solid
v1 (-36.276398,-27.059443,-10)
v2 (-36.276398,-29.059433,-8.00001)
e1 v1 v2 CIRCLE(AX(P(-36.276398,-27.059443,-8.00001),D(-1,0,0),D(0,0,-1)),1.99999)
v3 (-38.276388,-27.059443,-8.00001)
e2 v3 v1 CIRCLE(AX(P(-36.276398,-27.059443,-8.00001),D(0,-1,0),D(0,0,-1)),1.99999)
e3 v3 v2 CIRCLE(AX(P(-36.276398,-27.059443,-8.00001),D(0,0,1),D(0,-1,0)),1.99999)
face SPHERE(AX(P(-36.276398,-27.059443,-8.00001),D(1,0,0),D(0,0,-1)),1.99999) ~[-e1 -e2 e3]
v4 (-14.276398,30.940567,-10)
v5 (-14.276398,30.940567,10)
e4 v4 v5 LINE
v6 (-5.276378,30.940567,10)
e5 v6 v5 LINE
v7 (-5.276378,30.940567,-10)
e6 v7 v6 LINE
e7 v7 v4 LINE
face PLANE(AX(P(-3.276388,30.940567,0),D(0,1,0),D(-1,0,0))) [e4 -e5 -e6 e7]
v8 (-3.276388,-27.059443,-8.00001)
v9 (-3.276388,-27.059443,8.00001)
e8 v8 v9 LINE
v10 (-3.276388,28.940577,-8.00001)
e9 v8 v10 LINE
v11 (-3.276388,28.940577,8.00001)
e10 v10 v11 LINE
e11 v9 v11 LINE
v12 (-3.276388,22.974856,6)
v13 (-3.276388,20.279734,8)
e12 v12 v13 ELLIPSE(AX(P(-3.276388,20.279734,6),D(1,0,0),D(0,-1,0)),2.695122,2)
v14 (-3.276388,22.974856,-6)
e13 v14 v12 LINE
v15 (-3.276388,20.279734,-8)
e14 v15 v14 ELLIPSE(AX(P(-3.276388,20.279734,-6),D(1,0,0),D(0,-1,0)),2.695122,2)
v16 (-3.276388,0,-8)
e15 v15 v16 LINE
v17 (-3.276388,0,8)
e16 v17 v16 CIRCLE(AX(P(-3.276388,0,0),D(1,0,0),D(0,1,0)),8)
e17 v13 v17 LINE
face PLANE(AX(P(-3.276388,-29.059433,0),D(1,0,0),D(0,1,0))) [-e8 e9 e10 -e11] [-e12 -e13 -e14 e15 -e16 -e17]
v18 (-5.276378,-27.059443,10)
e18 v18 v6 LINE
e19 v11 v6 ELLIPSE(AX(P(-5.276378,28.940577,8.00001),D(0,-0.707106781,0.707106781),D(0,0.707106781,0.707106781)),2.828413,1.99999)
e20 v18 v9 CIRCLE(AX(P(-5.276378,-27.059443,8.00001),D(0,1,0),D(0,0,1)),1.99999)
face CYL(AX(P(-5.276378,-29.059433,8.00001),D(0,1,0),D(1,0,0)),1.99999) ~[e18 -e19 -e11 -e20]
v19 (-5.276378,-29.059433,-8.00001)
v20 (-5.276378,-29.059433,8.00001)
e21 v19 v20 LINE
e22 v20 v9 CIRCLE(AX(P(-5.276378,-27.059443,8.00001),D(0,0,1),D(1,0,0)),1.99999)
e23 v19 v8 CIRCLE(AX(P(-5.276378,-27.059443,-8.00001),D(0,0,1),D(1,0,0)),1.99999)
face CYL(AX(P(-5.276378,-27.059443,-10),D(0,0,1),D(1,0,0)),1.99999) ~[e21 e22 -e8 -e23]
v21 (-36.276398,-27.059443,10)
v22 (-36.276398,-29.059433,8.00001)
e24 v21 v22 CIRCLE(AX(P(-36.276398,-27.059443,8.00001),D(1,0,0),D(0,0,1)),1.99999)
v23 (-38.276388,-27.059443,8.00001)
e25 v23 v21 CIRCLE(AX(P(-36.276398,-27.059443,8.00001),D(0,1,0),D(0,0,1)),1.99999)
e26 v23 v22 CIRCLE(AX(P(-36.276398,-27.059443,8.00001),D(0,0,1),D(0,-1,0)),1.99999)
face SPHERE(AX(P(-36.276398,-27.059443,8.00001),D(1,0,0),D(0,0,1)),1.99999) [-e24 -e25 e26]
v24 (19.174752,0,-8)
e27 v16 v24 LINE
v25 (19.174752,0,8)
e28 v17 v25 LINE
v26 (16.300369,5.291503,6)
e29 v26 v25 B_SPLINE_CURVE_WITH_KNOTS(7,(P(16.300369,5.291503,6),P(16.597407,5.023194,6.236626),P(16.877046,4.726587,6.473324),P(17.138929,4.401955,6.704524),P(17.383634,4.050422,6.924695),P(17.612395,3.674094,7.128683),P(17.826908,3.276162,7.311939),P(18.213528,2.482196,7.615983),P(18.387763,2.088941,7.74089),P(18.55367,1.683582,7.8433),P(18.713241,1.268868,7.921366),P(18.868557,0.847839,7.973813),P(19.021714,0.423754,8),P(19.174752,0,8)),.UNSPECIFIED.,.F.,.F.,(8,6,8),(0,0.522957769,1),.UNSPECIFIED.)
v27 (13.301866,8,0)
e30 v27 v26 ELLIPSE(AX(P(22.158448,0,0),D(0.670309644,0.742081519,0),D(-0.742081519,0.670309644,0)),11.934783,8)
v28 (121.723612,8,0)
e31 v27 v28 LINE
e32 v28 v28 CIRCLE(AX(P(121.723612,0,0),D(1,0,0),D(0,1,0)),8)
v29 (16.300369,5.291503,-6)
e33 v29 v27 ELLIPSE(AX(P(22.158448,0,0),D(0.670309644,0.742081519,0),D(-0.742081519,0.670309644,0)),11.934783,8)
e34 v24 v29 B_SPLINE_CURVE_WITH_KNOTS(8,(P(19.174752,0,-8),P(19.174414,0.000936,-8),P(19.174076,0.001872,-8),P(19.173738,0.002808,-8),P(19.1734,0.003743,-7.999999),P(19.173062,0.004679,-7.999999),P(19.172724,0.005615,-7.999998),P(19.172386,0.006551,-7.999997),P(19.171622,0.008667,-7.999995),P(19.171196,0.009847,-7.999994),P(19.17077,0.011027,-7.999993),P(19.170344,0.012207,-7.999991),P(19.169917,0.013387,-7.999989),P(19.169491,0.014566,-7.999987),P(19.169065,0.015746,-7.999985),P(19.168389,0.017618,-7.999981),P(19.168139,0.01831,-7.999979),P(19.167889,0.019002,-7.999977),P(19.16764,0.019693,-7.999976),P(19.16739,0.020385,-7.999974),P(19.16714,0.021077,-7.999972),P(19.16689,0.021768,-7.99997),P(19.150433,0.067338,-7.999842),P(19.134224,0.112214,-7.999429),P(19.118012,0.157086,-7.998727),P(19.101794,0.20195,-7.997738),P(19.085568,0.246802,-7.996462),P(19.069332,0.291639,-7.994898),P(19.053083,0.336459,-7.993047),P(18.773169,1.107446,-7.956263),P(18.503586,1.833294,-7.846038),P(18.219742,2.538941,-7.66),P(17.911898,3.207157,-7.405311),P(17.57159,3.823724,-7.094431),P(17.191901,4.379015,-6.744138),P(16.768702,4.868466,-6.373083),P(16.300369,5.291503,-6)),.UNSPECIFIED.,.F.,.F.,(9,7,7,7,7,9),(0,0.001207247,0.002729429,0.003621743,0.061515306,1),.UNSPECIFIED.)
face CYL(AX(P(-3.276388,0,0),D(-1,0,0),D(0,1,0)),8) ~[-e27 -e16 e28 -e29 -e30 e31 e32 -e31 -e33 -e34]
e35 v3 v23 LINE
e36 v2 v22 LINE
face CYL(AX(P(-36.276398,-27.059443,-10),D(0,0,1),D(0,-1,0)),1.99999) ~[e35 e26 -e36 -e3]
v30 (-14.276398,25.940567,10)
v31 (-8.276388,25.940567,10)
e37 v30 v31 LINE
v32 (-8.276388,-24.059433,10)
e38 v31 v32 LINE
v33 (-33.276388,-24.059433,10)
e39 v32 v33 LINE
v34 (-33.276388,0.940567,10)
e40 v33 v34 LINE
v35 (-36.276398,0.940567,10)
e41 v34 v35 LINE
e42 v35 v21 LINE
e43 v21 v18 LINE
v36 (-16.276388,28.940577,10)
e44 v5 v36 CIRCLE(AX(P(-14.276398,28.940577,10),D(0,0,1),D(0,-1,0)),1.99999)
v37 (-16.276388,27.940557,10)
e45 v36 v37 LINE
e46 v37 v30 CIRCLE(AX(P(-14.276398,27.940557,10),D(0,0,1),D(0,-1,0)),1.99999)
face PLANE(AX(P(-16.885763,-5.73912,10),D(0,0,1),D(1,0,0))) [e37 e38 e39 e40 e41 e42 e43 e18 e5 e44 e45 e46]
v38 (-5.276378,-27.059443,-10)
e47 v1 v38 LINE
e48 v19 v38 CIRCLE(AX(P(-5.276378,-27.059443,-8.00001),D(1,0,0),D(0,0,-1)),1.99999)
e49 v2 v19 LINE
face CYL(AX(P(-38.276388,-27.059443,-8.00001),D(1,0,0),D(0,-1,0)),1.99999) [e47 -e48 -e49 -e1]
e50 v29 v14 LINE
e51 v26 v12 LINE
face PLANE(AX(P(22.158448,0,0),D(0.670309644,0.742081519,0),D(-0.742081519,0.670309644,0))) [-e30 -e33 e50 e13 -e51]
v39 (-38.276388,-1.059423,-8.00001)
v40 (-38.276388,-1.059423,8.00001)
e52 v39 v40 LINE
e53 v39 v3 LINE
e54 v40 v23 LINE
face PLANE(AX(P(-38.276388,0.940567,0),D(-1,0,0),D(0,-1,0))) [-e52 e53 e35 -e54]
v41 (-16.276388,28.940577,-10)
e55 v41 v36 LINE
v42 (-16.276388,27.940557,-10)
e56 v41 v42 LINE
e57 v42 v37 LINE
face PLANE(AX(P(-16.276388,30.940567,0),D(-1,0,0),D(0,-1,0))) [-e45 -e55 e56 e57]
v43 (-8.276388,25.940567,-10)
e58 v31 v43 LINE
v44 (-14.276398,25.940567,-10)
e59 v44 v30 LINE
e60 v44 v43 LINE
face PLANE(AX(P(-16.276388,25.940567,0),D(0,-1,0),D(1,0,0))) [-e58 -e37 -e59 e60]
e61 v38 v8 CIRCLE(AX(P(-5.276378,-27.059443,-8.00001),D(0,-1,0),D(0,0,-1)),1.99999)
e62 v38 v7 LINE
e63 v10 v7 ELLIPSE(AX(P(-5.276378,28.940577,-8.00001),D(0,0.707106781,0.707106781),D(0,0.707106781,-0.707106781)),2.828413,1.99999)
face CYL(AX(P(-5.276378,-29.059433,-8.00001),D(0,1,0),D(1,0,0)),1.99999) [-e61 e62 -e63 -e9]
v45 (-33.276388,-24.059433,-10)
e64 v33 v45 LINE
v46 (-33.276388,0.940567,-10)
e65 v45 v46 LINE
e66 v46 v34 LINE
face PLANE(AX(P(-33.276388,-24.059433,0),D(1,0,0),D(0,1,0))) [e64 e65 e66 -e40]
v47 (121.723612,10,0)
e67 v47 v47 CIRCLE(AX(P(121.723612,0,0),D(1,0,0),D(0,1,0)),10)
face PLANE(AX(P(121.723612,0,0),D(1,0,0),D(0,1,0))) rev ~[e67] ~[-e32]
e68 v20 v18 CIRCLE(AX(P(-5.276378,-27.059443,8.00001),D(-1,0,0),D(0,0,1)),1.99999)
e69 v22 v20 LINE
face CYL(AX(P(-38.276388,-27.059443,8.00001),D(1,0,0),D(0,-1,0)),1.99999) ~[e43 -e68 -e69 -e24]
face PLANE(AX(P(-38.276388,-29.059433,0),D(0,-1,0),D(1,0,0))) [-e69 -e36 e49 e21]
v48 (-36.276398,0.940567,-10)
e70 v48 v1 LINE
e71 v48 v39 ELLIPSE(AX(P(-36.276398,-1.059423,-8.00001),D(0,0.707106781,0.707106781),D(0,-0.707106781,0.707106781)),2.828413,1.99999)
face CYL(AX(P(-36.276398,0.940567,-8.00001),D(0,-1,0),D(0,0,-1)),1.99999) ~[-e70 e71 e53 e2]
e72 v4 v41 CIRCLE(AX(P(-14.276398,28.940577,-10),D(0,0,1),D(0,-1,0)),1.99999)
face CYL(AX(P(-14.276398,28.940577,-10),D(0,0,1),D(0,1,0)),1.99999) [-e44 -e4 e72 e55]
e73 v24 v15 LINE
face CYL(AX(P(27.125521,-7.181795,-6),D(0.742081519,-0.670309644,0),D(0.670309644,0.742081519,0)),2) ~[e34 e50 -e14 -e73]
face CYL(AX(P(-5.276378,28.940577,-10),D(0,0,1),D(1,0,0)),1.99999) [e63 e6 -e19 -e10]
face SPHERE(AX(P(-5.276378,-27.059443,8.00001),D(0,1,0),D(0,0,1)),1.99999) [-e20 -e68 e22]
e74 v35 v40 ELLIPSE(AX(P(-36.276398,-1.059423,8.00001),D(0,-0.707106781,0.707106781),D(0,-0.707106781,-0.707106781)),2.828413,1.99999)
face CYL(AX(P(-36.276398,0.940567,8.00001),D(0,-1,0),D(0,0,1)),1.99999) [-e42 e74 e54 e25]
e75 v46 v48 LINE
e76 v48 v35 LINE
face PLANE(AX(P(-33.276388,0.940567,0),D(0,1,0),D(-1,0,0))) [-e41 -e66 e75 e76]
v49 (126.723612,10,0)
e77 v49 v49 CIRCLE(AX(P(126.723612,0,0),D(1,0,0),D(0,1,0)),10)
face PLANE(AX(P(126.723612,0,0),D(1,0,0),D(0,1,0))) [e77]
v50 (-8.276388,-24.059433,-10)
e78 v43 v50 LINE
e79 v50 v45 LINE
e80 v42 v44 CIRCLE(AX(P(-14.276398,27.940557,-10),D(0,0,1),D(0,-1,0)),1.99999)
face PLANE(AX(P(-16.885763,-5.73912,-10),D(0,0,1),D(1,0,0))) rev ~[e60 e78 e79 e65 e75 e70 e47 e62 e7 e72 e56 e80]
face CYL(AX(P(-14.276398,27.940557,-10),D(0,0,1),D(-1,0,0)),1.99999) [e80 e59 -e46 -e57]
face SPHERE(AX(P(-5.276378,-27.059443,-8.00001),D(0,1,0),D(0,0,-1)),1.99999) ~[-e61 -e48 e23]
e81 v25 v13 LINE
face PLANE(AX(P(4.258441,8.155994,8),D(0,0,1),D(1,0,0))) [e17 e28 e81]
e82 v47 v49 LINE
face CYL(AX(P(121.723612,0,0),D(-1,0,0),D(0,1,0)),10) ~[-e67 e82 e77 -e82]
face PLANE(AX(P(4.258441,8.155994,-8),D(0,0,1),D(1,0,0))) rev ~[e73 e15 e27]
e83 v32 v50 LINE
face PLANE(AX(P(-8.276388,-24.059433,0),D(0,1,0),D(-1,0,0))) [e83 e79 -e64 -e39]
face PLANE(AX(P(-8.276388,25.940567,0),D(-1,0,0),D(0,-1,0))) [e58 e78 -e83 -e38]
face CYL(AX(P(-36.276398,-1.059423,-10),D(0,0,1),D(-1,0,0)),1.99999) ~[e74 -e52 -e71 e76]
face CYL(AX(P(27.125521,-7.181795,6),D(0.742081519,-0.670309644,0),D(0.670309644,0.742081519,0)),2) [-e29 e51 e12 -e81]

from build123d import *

# Parameters (mm, degrees)
F1_DEPTH     = 10
F2_R         = 8
F3_DEPTH     = 125
F4_R         = 10
F4_R_2       = 8
F5_DEPTH     = 5
F7_DEPTH     = 8
F8_T4_DEPTH  = 47.7749887628
F8_S5_R      = 8
F8_T6_DEPTH  = 26
F8_T11_DEPTH = 47.7749887628
F8_S12_R     = 8
F8_T13_DEPTH = 26
F9_R         = 1.99999


# Not quite as in the source:
# - a fillet or chamfer that OpenCascade refuses, or shapes differently, is made with other operations: its cross-section is extruded or revolved along the edge and cut away or added
# - a fillet or chamfer is up to 0.001 mm smaller than in the source, because OpenCascade refuses the exact size


with BuildPart() as f1:
    # F0 (on Top) → F1 (new body, symmetric)
    with BuildSketch(Plane.XY):
        Polygon((-33.2763881331, -24.0594327205), (-33.2763881331, 0.9405672795), (-38.2763881331, 0.9405672795), (-38.2763881331, -29.0594327205), (-3.2763881331, -29.0594327205), (-3.2763881331, 30.9405672795), (-16.2763881331, 30.9405672795), (-16.2763881331, 25.9405672795), (-8.2763881331, 25.9405672795), (-8.2763881331, -24.0594327205), align=None)
    extrude(amount=F1_DEPTH, both=True)

    # F2 (on face) → F3 (join)
    with BuildSketch(Plane.YZ.offset(-3.2763881331)):
        Circle(F2_R)
    extrude(amount=F3_DEPTH)

    # F4 (on face) → F5 (join)
    with BuildSketch(Plane.YZ.offset(121.7236118669)):
        Circle(F4_R)
        Circle(F4_R_2, mode=Mode.SUBTRACT)
        Circle(F4_R_2)
    extrude(amount=F5_DEPTH)

    # F6 (on Top) → F7 (join, symmetric)
    with BuildSketch(Plane.XY):
        Polygon((22.1584475915, 0), (-4.7209444456, 24.2796987295), (-7.46962009, 0), align=None)
    extrude(amount=F7_DEPTH, both=True)

    # F8: fillet of radius 2 on 2 edges, made by hand


with BuildPart() as f8_tool2:
    # F8_s3 → F8_t4 (new body)
    with BuildSketch(Plane(origin=(18.5100171986, -16.719784452, 0), x_dir=(0, 0, 1), z_dir=(-0.742081519, 0.6703096442, 0))):
        with BuildLine():
            ThreePointArc((6, 14.8530211221), (7.4142135624, 14.2672346845), (8, 12.8530211221))
            Line((8, 12.8530211221), (8, 14.8530211221))
            Line((8, 14.8530211221), (6, 14.8530211221))
        make_face()
    extrude(amount=F8_T4_DEPTH)

    # F8_s5 → F8_t6 (cut, symmetric)
    with BuildSketch(Plane.YZ.offset(10.1)):
        Circle(F8_S5_R)
    extrude(amount=F8_T6_DEPTH, both=True, mode=Mode.SUBTRACT)

    split(bisect_by=Plane.YZ.offset(-3.2763881331), keep=Keep.TOP)


with BuildPart() as f1_1:
    add(f1.part)

    # F8_t1: cut F8_tool2
    add(f8_tool2.part, mode=Mode.SUBTRACT)


with BuildPart() as f8_tool9:
    # F8_s10 → F8_t11 (new body)
    with BuildSketch(Plane(origin=(18.5100171986, -16.719784452, 0), x_dir=(0, 0, 1), z_dir=(-0.742081519, 0.6703096442, 0))):
        with BuildLine():
            ThreePointArc((-6, 14.8530211221), (-7.4142135624, 14.2672346845), (-8, 12.8530211221))
            Line((-8, 12.8530211221), (-8, 14.8530211221))
            Line((-8, 14.8530211221), (-6, 14.8530211221))
        make_face()
    extrude(amount=F8_T11_DEPTH)

    # F8_s12 → F8_t13 (cut, symmetric)
    with BuildSketch(Plane.YZ.offset(10.1)):
        Circle(F8_S12_R)
    extrude(amount=F8_T13_DEPTH, both=True, mode=Mode.SUBTRACT)

    split(bisect_by=Plane.YZ.offset(-3.2763881331), keep=Keep.TOP)


with BuildPart() as f1_2:
    add(f1_1.part)

    # F8_t8: cut F8_tool9
    add(f8_tool9.part, mode=Mode.SUBTRACT)

    # F9 (radius 2 in the source; OpenCascade refuses exactly that, so slightly less here)
    f9_edges = [f1_2.edges().sort_by_distance(p)[0] for p in [
        (-3.276388, 0.940567, 10),
        (-3.276388, 0.940567, -10),
        (-20.776388, -29.059433, 10),
        (-20.776388, -29.059433, -10),
        (-38.276388, -14.059433, 10),
        (-38.276388, -14.059433, -10),
        (-38.276388, -29.059433, 0),
        (-38.276388, 0.940567, 0),
        (-3.276388, -29.059433, 0),
        (-3.276388, 30.940567, 0),
        (-16.276388, 30.940567, 0),
        (-16.276388, 25.940567, 0),
    ]]
    fillet(f9_edges, radius=F9_R)


solid = f1_2.part
